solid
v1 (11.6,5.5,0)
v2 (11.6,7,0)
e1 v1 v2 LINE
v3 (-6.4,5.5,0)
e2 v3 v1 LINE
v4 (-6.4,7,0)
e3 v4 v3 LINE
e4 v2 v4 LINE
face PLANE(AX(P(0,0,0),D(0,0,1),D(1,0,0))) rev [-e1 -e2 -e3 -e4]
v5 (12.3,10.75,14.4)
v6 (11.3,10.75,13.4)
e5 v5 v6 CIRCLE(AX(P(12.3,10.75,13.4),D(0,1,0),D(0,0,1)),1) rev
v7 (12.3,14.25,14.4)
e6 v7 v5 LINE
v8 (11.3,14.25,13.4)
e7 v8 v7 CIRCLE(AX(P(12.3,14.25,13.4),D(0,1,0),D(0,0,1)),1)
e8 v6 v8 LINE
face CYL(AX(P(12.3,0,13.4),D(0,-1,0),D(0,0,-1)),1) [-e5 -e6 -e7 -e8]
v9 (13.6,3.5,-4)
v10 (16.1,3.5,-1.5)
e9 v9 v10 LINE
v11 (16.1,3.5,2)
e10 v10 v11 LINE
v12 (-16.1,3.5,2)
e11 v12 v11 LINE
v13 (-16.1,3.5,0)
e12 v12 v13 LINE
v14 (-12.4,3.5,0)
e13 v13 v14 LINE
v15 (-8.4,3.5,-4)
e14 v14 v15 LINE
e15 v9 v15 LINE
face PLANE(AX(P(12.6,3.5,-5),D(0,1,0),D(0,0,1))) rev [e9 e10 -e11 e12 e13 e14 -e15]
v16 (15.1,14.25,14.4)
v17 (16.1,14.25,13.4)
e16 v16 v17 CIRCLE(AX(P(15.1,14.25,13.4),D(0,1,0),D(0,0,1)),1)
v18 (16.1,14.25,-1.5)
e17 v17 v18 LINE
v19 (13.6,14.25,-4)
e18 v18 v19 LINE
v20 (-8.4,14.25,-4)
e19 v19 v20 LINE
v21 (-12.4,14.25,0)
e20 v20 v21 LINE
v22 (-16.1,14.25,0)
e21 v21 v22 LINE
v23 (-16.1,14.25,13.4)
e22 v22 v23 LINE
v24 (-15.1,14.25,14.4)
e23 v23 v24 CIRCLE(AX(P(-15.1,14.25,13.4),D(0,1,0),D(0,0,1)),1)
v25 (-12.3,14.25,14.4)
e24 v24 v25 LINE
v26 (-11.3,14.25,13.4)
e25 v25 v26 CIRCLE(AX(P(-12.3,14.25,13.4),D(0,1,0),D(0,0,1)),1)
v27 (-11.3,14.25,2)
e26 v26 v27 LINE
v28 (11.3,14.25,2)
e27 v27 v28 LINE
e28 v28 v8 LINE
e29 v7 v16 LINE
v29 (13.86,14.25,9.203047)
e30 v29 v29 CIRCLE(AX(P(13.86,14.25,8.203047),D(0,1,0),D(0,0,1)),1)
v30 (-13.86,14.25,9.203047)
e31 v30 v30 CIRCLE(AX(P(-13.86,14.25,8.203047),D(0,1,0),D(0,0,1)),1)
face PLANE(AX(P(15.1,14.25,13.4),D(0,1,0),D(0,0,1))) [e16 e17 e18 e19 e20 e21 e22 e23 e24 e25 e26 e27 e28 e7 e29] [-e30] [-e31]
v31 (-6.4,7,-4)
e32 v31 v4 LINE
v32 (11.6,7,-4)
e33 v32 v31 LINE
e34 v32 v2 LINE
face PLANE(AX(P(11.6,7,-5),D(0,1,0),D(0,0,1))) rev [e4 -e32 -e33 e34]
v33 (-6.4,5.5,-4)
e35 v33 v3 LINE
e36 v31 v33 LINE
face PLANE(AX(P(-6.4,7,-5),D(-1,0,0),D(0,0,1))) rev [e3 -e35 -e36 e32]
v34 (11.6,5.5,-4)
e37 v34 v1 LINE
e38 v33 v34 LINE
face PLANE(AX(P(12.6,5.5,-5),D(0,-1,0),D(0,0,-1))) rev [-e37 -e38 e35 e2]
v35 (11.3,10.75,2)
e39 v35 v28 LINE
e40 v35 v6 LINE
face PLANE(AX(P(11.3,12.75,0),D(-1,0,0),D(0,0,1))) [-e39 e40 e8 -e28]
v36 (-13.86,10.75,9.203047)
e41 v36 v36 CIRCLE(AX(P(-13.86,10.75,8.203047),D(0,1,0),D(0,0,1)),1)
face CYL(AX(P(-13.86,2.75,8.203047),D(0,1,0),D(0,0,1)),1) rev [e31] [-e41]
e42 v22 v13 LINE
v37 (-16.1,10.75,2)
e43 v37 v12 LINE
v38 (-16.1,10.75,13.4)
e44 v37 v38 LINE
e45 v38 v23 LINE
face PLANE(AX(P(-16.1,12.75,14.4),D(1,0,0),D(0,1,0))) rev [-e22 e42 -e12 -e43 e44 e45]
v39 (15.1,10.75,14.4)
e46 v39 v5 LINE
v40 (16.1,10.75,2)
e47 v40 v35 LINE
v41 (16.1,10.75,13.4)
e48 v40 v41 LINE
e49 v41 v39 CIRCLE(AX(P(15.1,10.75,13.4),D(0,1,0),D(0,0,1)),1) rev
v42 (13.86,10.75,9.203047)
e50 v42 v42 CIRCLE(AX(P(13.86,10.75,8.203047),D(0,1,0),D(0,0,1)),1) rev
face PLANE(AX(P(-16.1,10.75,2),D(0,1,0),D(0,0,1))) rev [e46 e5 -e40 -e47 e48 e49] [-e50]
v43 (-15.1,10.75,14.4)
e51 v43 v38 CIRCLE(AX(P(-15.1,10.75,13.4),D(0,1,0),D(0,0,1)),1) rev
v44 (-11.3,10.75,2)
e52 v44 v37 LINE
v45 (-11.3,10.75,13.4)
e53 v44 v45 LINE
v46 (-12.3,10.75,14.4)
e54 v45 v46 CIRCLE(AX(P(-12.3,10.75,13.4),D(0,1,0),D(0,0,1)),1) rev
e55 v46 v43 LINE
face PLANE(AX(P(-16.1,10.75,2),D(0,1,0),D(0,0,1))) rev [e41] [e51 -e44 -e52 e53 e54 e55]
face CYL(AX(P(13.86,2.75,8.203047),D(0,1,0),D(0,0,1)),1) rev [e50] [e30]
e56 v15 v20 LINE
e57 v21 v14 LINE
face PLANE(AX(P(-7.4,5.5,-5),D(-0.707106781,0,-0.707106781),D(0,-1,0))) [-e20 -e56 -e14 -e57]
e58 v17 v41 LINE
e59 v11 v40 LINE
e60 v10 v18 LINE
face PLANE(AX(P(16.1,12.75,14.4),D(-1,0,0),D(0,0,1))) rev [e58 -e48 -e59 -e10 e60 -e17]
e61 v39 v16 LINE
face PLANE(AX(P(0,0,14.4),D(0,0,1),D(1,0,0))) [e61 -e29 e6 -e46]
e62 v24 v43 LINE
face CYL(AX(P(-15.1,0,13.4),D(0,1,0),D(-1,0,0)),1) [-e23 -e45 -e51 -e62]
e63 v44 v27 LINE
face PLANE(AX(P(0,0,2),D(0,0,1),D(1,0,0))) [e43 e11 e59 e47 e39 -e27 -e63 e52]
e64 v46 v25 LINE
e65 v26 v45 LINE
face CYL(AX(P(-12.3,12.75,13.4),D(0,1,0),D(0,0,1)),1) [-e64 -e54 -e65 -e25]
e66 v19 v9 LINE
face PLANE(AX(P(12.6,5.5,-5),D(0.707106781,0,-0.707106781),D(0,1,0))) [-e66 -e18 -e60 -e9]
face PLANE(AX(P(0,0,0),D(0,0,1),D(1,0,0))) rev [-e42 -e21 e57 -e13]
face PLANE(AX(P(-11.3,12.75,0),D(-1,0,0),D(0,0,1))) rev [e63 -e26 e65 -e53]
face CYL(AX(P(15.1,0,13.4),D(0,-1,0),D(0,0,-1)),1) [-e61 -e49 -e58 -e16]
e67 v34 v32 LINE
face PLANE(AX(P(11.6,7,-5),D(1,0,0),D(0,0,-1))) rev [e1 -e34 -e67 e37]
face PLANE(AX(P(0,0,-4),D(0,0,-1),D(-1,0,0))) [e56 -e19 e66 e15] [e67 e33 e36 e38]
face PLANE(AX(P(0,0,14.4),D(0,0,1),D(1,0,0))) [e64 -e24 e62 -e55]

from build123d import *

# Parameters (mm, degrees)
SKETCH1_W           = 32.2
SKETCH1_H           = 25.5
BOSS_EXTRUDE1_DEPTH = 14.4
SKETCH3_W           = 32.2
SKETCH3_H           = 21.75
CUT_EXTRUDE1_DEPTH  = 12.4
SKETCH5_W           = 22.6
SKETCH5_H           = 2
CUT_EXTRUDE2_DEPTH  = 14.4
FILLET1_R           = 1
FILLET2_R           = 1
FILLET3_R           = 1
FILLET4_R           = 1
SKETCH10_R          = 1
CUT_EXTRUDE3_DEPTH  = 10
SKETCH11_W          = 4.85
SKETCH11_H          = 1.75
CUT_EXTRUDE4_DEPTH  = 20
FILLET5_R           = 1
SKETCH12_W          = 20
SKETCH12_H          = 2
BOSS_EXTRUDE2_DEPTH = 5
BOSS_EXTRUDE3_DEPTH = 5
SKETCH14_W          = 37.842545744
SKETCH14_H          = 22.134319208
CUT_EXTRUDE5_DEPTH  = 28.030214576
BOSS_EXTRUDE5_DEPTH = 3.75
CHAMFER1_SIZE       = 5
BOSS_EXTRUDE6_START = 1.5
SKETCH16_R          = 1
BOSS_EXTRUDE6_DEPTH = 1.5
SKETCH17_W          = 31.920460338
SKETCH17_H          = 22.260321026
CUT_EXTRUDE6_DEPTH  = 1


with BuildPart() as part:
    # Sketch1 → Boss-Extrude1 (new body)
    with BuildSketch(Plane.XY):
        Rectangle(SKETCH1_W, SKETCH1_H)
    extrude(amount=BOSS_EXTRUDE1_DEPTH)

    # Sketch3 → Cut-Extrude1 (cut)
    with BuildSketch(Plane.XY.offset(14.4)):
        with Locations((0, -0.125)):
            Rectangle(SKETCH3_W, SKETCH3_H)
    extrude(amount=-CUT_EXTRUDE1_DEPTH, mode=Mode.SUBTRACT)

    # Sketch5 → Cut-Extrude2 (cut)
    with BuildSketch(Plane.XY.offset(14.4)):
        with Locations((0, 11.75)):
            Rectangle(SKETCH5_W, SKETCH5_H)
    extrude(amount=-CUT_EXTRUDE2_DEPTH, mode=Mode.SUBTRACT)

    # Fillet1
    fillet1_edges = [part.edges().sort_by_distance(p)[0] for p in [
        (-11.3, 11.75, 14.4),
    ]]
    fillet(fillet1_edges, radius=FILLET1_R)

    # Fillet2
    fillet2_edges = [part.edges().sort_by_distance(p)[0] for p in [
        (-16.1, 11.75, 14.4),
    ]]
    fillet(fillet2_edges, radius=FILLET2_R)

    # Fillet3
    fillet3_edges = [part.edges().sort_by_distance(p)[0] for p in [
        (11.3, 11.75, 14.4),
    ]]
    fillet(fillet3_edges, radius=FILLET3_R)

    # Fillet4
    fillet4_edges = [part.edges().sort_by_distance(p)[0] for p in [
        (16.1, 11.75, 14.4),
    ]]
    fillet(fillet4_edges, radius=FILLET4_R)

    # Sketch10 → Cut-Extrude3 (cut)
    with BuildSketch(Plane(origin=(0, 12.75, 0), x_dir=(1, 0, 0), z_dir=(0, 1, 0))):
        with Locations(Location((-13.86, -8.203047487, 0), (0, 0, 270))):
            Circle(SKETCH10_R)
    cut_extrude3 = extrude(amount=-CUT_EXTRUDE3_DEPTH, mode=Mode.SUBTRACT)

    # Mirror1: Cut-Extrude3 across plane
    add(cut_extrude3.mirror(Plane(origin=(0, 0, 0), x_dir=(0, 0, 1), z_dir=(1, 0, 0))), mode=Mode.SUBTRACT)

    # Sketch11 → Cut-Extrude4 (cut)
    with BuildSketch(Plane.XY.offset(14.4)):
        with Locations((-13.675, -11.875)):
            Rectangle(SKETCH11_W, SKETCH11_H)
    cut_extrude4 = extrude(amount=-CUT_EXTRUDE4_DEPTH, mode=Mode.SUBTRACT)

    # Mirror2: Cut-Extrude4 across plane
    add(cut_extrude4.mirror(Plane(origin=(0, 0, 0), x_dir=(0, 0, 1), z_dir=(1, 0, 0))), mode=Mode.SUBTRACT)

    # Fillet5
    fillet5_edges = [part.edges().sort_by_distance(p)[0] for p in [
        (16.1, -11, 1),
        (11.25, -11.875, 14.4),
        (11.25, -11.875, 0),
        (-11.25, -11.875, 0),
        (-16.1, -11, 1),
        (-11.25, -11.875, 14.4),
    ]]
    fillet(fillet5_edges, radius=FILLET5_R)

    # Sketch12 → Boss-Extrude2 (add)
    with BuildSketch(Plane(origin=(0, 0, 0), x_dir=(-1, 0, 0), z_dir=(0, 0, -1))):
        with Locations((-2.6, 4.5)):
            Rectangle(SKETCH12_W, SKETCH12_H)
    extrude(amount=BOSS_EXTRUDE2_DEPTH)

    # Sketch13 → Boss-Extrude3 (add)
    with BuildSketch(Plane(origin=(0, 0, 0), x_dir=(-1, 0, 0), z_dir=(0, 0, -1))):
        Polygon((-12.6, 9), (7.4, 9), (7.4, 7), (7.4, 5.5), (6.4, 5.5), (6.4, 7), (-11.6, 7), (-11.6, 5.5), (-12.6, 5.5), (-12.6, 7), align=None)
    extrude(amount=BOSS_EXTRUDE3_DEPTH)

    # Sketch14 → Cut-Extrude5 (cut, through all)
    with BuildSketch(Plane.XZ.offset(-3.5)):
        with Locations((-0.315004543, 4.826001817)):
            Rectangle(SKETCH14_W, SKETCH14_H)
    extrude(amount=CUT_EXTRUDE5_DEPTH, mode=Mode.SUBTRACT)

    # Sketch15 → Boss-Extrude5 (add)
    with BuildSketch(Plane(origin=(0, 12.75, 0), x_dir=(1, 0, 0), z_dir=(0, 1, 0))):
        Polygon((11.3, 0), (12.6, 0), (12.6, 5), (-7.4, 5), (-7.4, 0), (-11.3, 0), (-11.3, -2), (11.3, -2), align=None)
    extrude(amount=-BOSS_EXTRUDE5_DEPTH)

    # Chamfer1
    # the kernel refuses this chamfer: 5 mm, written as the material it adds along each edge
    with BuildSketch(Plane(origin=(-7.4, 3.5, 0), x_dir=(-0.9996219169112968, 0, 0.027495876610586372), z_dir=(0, 1, 0))) as chamfer1_piece_1_section:
        Polygon((CHAMFER1_SIZE * 0.999621916911, -CHAMFER1_SIZE * 0.0274958766106), (-CHAMFER1_SIZE * 0.0274958766106, -CHAMFER1_SIZE * 0.999621916911), (0, 0), align=None)
    chamfer1_piece_1 = extrude(amount=9.25, mode=Mode.PRIVATE)
    chamfer1_piece_1 = split(chamfer1_piece_1, bisect_by=Plane(origin=(-9.052020772, 8.125, -5), z_dir=(0, 0, 1)), keep=Keep.TOP, mode=Mode.PRIVATE)
    add(chamfer1_piece_1)
    with BuildSketch(Plane(origin=(12.6, 3.5, 0), x_dir=(-0.027495876610586317, 0, -0.9996219169112968), z_dir=(0, 1, 0))) as chamfer1_piece_2_section:
        Polygon((CHAMFER1_SIZE * 0.999621916911, -CHAMFER1_SIZE * 0.0274958766106), (-CHAMFER1_SIZE * 0.0274958766106, -CHAMFER1_SIZE * 0.999621916911), (0, 0), align=None)
    chamfer1_piece_2 = extrude(amount=9.25, mode=Mode.PRIVATE)
    chamfer1_piece_2 = split(chamfer1_piece_2, bisect_by=Plane(origin=(16.1, 8.125, -1.788652221), z_dir=(-1, 0, 0)), keep=Keep.TOP, mode=Mode.PRIVATE)
    chamfer1_piece_2 = split(chamfer1_piece_2, bisect_by=Plane(origin=(13.973224067, 8.125, -5), z_dir=(0, 0, 1)), keep=Keep.TOP, mode=Mode.PRIVATE)
    add(chamfer1_piece_2)

    # Sketch16 → Boss-Extrude6 (add)
    with BuildSketch(Plane(origin=(0, 12.75, 0), x_dir=(1, 0, 0), z_dir=(0, 1, 0)).offset(BOSS_EXTRUDE6_START)):
        with BuildLine():
            Line((16.1, -13.4), (16.1, 1.5))
            Line((16.1, 1.5), (12.6, 5))
            Line((12.6, 5), (-7.4, 5))
            Line((-7.4, 5), (-12.4, 0))
            Line((-12.4, 0), (-16.1, 0))
            Line((-16.1, 0), (-16.1, -13.4))
            ThreePointArc((-16.1, -13.4), (-15.807106781, -14.107106781), (-15.1, -14.4))
            Line((-15.1, -14.4), (-12.3, -14.4))
            ThreePointArc((-12.3, -14.4), (-11.592893219, -14.107106781), (-11.3, -13.4))
            Line((-11.3, -13.4), (-11.3, -2))
            Line((-11.3, -2), (11.3, -2))
            Line((11.3, -2), (11.3, -13.4))
            ThreePointArc((11.3, -13.4), (11.592893219, -14.107106781), (12.3, -14.4))
            Line((12.3, -14.4), (15.1, -14.4))
            ThreePointArc((15.1, -14.4), (15.807106781, -14.107106781), (16.1, -13.4))
        make_face()
        with Locations(Location((13.86, -8.203047487, 0), (0, 0, 270))):
            Circle(SKETCH16_R, mode=Mode.SUBTRACT)
        with Locations(Location((-13.86, -8.203047487, 0), (0, 0, 270))):
            Circle(SKETCH16_R, mode=Mode.SUBTRACT)
    extrude(amount=-BOSS_EXTRUDE6_DEPTH)

    # Sketch17 → Cut-Extrude6 (cut)
    with BuildSketch(Plane(origin=(0, 0, -5), x_dir=(-1, 0, 0), z_dir=(0, 0, -1))):
        with Locations((-2.436035131, 9.274005754)):
            Rectangle(SKETCH17_W, SKETCH17_H)
    extrude(amount=-CUT_EXTRUDE6_DEPTH, mode=Mode.SUBTRACT)


solid = part.part
